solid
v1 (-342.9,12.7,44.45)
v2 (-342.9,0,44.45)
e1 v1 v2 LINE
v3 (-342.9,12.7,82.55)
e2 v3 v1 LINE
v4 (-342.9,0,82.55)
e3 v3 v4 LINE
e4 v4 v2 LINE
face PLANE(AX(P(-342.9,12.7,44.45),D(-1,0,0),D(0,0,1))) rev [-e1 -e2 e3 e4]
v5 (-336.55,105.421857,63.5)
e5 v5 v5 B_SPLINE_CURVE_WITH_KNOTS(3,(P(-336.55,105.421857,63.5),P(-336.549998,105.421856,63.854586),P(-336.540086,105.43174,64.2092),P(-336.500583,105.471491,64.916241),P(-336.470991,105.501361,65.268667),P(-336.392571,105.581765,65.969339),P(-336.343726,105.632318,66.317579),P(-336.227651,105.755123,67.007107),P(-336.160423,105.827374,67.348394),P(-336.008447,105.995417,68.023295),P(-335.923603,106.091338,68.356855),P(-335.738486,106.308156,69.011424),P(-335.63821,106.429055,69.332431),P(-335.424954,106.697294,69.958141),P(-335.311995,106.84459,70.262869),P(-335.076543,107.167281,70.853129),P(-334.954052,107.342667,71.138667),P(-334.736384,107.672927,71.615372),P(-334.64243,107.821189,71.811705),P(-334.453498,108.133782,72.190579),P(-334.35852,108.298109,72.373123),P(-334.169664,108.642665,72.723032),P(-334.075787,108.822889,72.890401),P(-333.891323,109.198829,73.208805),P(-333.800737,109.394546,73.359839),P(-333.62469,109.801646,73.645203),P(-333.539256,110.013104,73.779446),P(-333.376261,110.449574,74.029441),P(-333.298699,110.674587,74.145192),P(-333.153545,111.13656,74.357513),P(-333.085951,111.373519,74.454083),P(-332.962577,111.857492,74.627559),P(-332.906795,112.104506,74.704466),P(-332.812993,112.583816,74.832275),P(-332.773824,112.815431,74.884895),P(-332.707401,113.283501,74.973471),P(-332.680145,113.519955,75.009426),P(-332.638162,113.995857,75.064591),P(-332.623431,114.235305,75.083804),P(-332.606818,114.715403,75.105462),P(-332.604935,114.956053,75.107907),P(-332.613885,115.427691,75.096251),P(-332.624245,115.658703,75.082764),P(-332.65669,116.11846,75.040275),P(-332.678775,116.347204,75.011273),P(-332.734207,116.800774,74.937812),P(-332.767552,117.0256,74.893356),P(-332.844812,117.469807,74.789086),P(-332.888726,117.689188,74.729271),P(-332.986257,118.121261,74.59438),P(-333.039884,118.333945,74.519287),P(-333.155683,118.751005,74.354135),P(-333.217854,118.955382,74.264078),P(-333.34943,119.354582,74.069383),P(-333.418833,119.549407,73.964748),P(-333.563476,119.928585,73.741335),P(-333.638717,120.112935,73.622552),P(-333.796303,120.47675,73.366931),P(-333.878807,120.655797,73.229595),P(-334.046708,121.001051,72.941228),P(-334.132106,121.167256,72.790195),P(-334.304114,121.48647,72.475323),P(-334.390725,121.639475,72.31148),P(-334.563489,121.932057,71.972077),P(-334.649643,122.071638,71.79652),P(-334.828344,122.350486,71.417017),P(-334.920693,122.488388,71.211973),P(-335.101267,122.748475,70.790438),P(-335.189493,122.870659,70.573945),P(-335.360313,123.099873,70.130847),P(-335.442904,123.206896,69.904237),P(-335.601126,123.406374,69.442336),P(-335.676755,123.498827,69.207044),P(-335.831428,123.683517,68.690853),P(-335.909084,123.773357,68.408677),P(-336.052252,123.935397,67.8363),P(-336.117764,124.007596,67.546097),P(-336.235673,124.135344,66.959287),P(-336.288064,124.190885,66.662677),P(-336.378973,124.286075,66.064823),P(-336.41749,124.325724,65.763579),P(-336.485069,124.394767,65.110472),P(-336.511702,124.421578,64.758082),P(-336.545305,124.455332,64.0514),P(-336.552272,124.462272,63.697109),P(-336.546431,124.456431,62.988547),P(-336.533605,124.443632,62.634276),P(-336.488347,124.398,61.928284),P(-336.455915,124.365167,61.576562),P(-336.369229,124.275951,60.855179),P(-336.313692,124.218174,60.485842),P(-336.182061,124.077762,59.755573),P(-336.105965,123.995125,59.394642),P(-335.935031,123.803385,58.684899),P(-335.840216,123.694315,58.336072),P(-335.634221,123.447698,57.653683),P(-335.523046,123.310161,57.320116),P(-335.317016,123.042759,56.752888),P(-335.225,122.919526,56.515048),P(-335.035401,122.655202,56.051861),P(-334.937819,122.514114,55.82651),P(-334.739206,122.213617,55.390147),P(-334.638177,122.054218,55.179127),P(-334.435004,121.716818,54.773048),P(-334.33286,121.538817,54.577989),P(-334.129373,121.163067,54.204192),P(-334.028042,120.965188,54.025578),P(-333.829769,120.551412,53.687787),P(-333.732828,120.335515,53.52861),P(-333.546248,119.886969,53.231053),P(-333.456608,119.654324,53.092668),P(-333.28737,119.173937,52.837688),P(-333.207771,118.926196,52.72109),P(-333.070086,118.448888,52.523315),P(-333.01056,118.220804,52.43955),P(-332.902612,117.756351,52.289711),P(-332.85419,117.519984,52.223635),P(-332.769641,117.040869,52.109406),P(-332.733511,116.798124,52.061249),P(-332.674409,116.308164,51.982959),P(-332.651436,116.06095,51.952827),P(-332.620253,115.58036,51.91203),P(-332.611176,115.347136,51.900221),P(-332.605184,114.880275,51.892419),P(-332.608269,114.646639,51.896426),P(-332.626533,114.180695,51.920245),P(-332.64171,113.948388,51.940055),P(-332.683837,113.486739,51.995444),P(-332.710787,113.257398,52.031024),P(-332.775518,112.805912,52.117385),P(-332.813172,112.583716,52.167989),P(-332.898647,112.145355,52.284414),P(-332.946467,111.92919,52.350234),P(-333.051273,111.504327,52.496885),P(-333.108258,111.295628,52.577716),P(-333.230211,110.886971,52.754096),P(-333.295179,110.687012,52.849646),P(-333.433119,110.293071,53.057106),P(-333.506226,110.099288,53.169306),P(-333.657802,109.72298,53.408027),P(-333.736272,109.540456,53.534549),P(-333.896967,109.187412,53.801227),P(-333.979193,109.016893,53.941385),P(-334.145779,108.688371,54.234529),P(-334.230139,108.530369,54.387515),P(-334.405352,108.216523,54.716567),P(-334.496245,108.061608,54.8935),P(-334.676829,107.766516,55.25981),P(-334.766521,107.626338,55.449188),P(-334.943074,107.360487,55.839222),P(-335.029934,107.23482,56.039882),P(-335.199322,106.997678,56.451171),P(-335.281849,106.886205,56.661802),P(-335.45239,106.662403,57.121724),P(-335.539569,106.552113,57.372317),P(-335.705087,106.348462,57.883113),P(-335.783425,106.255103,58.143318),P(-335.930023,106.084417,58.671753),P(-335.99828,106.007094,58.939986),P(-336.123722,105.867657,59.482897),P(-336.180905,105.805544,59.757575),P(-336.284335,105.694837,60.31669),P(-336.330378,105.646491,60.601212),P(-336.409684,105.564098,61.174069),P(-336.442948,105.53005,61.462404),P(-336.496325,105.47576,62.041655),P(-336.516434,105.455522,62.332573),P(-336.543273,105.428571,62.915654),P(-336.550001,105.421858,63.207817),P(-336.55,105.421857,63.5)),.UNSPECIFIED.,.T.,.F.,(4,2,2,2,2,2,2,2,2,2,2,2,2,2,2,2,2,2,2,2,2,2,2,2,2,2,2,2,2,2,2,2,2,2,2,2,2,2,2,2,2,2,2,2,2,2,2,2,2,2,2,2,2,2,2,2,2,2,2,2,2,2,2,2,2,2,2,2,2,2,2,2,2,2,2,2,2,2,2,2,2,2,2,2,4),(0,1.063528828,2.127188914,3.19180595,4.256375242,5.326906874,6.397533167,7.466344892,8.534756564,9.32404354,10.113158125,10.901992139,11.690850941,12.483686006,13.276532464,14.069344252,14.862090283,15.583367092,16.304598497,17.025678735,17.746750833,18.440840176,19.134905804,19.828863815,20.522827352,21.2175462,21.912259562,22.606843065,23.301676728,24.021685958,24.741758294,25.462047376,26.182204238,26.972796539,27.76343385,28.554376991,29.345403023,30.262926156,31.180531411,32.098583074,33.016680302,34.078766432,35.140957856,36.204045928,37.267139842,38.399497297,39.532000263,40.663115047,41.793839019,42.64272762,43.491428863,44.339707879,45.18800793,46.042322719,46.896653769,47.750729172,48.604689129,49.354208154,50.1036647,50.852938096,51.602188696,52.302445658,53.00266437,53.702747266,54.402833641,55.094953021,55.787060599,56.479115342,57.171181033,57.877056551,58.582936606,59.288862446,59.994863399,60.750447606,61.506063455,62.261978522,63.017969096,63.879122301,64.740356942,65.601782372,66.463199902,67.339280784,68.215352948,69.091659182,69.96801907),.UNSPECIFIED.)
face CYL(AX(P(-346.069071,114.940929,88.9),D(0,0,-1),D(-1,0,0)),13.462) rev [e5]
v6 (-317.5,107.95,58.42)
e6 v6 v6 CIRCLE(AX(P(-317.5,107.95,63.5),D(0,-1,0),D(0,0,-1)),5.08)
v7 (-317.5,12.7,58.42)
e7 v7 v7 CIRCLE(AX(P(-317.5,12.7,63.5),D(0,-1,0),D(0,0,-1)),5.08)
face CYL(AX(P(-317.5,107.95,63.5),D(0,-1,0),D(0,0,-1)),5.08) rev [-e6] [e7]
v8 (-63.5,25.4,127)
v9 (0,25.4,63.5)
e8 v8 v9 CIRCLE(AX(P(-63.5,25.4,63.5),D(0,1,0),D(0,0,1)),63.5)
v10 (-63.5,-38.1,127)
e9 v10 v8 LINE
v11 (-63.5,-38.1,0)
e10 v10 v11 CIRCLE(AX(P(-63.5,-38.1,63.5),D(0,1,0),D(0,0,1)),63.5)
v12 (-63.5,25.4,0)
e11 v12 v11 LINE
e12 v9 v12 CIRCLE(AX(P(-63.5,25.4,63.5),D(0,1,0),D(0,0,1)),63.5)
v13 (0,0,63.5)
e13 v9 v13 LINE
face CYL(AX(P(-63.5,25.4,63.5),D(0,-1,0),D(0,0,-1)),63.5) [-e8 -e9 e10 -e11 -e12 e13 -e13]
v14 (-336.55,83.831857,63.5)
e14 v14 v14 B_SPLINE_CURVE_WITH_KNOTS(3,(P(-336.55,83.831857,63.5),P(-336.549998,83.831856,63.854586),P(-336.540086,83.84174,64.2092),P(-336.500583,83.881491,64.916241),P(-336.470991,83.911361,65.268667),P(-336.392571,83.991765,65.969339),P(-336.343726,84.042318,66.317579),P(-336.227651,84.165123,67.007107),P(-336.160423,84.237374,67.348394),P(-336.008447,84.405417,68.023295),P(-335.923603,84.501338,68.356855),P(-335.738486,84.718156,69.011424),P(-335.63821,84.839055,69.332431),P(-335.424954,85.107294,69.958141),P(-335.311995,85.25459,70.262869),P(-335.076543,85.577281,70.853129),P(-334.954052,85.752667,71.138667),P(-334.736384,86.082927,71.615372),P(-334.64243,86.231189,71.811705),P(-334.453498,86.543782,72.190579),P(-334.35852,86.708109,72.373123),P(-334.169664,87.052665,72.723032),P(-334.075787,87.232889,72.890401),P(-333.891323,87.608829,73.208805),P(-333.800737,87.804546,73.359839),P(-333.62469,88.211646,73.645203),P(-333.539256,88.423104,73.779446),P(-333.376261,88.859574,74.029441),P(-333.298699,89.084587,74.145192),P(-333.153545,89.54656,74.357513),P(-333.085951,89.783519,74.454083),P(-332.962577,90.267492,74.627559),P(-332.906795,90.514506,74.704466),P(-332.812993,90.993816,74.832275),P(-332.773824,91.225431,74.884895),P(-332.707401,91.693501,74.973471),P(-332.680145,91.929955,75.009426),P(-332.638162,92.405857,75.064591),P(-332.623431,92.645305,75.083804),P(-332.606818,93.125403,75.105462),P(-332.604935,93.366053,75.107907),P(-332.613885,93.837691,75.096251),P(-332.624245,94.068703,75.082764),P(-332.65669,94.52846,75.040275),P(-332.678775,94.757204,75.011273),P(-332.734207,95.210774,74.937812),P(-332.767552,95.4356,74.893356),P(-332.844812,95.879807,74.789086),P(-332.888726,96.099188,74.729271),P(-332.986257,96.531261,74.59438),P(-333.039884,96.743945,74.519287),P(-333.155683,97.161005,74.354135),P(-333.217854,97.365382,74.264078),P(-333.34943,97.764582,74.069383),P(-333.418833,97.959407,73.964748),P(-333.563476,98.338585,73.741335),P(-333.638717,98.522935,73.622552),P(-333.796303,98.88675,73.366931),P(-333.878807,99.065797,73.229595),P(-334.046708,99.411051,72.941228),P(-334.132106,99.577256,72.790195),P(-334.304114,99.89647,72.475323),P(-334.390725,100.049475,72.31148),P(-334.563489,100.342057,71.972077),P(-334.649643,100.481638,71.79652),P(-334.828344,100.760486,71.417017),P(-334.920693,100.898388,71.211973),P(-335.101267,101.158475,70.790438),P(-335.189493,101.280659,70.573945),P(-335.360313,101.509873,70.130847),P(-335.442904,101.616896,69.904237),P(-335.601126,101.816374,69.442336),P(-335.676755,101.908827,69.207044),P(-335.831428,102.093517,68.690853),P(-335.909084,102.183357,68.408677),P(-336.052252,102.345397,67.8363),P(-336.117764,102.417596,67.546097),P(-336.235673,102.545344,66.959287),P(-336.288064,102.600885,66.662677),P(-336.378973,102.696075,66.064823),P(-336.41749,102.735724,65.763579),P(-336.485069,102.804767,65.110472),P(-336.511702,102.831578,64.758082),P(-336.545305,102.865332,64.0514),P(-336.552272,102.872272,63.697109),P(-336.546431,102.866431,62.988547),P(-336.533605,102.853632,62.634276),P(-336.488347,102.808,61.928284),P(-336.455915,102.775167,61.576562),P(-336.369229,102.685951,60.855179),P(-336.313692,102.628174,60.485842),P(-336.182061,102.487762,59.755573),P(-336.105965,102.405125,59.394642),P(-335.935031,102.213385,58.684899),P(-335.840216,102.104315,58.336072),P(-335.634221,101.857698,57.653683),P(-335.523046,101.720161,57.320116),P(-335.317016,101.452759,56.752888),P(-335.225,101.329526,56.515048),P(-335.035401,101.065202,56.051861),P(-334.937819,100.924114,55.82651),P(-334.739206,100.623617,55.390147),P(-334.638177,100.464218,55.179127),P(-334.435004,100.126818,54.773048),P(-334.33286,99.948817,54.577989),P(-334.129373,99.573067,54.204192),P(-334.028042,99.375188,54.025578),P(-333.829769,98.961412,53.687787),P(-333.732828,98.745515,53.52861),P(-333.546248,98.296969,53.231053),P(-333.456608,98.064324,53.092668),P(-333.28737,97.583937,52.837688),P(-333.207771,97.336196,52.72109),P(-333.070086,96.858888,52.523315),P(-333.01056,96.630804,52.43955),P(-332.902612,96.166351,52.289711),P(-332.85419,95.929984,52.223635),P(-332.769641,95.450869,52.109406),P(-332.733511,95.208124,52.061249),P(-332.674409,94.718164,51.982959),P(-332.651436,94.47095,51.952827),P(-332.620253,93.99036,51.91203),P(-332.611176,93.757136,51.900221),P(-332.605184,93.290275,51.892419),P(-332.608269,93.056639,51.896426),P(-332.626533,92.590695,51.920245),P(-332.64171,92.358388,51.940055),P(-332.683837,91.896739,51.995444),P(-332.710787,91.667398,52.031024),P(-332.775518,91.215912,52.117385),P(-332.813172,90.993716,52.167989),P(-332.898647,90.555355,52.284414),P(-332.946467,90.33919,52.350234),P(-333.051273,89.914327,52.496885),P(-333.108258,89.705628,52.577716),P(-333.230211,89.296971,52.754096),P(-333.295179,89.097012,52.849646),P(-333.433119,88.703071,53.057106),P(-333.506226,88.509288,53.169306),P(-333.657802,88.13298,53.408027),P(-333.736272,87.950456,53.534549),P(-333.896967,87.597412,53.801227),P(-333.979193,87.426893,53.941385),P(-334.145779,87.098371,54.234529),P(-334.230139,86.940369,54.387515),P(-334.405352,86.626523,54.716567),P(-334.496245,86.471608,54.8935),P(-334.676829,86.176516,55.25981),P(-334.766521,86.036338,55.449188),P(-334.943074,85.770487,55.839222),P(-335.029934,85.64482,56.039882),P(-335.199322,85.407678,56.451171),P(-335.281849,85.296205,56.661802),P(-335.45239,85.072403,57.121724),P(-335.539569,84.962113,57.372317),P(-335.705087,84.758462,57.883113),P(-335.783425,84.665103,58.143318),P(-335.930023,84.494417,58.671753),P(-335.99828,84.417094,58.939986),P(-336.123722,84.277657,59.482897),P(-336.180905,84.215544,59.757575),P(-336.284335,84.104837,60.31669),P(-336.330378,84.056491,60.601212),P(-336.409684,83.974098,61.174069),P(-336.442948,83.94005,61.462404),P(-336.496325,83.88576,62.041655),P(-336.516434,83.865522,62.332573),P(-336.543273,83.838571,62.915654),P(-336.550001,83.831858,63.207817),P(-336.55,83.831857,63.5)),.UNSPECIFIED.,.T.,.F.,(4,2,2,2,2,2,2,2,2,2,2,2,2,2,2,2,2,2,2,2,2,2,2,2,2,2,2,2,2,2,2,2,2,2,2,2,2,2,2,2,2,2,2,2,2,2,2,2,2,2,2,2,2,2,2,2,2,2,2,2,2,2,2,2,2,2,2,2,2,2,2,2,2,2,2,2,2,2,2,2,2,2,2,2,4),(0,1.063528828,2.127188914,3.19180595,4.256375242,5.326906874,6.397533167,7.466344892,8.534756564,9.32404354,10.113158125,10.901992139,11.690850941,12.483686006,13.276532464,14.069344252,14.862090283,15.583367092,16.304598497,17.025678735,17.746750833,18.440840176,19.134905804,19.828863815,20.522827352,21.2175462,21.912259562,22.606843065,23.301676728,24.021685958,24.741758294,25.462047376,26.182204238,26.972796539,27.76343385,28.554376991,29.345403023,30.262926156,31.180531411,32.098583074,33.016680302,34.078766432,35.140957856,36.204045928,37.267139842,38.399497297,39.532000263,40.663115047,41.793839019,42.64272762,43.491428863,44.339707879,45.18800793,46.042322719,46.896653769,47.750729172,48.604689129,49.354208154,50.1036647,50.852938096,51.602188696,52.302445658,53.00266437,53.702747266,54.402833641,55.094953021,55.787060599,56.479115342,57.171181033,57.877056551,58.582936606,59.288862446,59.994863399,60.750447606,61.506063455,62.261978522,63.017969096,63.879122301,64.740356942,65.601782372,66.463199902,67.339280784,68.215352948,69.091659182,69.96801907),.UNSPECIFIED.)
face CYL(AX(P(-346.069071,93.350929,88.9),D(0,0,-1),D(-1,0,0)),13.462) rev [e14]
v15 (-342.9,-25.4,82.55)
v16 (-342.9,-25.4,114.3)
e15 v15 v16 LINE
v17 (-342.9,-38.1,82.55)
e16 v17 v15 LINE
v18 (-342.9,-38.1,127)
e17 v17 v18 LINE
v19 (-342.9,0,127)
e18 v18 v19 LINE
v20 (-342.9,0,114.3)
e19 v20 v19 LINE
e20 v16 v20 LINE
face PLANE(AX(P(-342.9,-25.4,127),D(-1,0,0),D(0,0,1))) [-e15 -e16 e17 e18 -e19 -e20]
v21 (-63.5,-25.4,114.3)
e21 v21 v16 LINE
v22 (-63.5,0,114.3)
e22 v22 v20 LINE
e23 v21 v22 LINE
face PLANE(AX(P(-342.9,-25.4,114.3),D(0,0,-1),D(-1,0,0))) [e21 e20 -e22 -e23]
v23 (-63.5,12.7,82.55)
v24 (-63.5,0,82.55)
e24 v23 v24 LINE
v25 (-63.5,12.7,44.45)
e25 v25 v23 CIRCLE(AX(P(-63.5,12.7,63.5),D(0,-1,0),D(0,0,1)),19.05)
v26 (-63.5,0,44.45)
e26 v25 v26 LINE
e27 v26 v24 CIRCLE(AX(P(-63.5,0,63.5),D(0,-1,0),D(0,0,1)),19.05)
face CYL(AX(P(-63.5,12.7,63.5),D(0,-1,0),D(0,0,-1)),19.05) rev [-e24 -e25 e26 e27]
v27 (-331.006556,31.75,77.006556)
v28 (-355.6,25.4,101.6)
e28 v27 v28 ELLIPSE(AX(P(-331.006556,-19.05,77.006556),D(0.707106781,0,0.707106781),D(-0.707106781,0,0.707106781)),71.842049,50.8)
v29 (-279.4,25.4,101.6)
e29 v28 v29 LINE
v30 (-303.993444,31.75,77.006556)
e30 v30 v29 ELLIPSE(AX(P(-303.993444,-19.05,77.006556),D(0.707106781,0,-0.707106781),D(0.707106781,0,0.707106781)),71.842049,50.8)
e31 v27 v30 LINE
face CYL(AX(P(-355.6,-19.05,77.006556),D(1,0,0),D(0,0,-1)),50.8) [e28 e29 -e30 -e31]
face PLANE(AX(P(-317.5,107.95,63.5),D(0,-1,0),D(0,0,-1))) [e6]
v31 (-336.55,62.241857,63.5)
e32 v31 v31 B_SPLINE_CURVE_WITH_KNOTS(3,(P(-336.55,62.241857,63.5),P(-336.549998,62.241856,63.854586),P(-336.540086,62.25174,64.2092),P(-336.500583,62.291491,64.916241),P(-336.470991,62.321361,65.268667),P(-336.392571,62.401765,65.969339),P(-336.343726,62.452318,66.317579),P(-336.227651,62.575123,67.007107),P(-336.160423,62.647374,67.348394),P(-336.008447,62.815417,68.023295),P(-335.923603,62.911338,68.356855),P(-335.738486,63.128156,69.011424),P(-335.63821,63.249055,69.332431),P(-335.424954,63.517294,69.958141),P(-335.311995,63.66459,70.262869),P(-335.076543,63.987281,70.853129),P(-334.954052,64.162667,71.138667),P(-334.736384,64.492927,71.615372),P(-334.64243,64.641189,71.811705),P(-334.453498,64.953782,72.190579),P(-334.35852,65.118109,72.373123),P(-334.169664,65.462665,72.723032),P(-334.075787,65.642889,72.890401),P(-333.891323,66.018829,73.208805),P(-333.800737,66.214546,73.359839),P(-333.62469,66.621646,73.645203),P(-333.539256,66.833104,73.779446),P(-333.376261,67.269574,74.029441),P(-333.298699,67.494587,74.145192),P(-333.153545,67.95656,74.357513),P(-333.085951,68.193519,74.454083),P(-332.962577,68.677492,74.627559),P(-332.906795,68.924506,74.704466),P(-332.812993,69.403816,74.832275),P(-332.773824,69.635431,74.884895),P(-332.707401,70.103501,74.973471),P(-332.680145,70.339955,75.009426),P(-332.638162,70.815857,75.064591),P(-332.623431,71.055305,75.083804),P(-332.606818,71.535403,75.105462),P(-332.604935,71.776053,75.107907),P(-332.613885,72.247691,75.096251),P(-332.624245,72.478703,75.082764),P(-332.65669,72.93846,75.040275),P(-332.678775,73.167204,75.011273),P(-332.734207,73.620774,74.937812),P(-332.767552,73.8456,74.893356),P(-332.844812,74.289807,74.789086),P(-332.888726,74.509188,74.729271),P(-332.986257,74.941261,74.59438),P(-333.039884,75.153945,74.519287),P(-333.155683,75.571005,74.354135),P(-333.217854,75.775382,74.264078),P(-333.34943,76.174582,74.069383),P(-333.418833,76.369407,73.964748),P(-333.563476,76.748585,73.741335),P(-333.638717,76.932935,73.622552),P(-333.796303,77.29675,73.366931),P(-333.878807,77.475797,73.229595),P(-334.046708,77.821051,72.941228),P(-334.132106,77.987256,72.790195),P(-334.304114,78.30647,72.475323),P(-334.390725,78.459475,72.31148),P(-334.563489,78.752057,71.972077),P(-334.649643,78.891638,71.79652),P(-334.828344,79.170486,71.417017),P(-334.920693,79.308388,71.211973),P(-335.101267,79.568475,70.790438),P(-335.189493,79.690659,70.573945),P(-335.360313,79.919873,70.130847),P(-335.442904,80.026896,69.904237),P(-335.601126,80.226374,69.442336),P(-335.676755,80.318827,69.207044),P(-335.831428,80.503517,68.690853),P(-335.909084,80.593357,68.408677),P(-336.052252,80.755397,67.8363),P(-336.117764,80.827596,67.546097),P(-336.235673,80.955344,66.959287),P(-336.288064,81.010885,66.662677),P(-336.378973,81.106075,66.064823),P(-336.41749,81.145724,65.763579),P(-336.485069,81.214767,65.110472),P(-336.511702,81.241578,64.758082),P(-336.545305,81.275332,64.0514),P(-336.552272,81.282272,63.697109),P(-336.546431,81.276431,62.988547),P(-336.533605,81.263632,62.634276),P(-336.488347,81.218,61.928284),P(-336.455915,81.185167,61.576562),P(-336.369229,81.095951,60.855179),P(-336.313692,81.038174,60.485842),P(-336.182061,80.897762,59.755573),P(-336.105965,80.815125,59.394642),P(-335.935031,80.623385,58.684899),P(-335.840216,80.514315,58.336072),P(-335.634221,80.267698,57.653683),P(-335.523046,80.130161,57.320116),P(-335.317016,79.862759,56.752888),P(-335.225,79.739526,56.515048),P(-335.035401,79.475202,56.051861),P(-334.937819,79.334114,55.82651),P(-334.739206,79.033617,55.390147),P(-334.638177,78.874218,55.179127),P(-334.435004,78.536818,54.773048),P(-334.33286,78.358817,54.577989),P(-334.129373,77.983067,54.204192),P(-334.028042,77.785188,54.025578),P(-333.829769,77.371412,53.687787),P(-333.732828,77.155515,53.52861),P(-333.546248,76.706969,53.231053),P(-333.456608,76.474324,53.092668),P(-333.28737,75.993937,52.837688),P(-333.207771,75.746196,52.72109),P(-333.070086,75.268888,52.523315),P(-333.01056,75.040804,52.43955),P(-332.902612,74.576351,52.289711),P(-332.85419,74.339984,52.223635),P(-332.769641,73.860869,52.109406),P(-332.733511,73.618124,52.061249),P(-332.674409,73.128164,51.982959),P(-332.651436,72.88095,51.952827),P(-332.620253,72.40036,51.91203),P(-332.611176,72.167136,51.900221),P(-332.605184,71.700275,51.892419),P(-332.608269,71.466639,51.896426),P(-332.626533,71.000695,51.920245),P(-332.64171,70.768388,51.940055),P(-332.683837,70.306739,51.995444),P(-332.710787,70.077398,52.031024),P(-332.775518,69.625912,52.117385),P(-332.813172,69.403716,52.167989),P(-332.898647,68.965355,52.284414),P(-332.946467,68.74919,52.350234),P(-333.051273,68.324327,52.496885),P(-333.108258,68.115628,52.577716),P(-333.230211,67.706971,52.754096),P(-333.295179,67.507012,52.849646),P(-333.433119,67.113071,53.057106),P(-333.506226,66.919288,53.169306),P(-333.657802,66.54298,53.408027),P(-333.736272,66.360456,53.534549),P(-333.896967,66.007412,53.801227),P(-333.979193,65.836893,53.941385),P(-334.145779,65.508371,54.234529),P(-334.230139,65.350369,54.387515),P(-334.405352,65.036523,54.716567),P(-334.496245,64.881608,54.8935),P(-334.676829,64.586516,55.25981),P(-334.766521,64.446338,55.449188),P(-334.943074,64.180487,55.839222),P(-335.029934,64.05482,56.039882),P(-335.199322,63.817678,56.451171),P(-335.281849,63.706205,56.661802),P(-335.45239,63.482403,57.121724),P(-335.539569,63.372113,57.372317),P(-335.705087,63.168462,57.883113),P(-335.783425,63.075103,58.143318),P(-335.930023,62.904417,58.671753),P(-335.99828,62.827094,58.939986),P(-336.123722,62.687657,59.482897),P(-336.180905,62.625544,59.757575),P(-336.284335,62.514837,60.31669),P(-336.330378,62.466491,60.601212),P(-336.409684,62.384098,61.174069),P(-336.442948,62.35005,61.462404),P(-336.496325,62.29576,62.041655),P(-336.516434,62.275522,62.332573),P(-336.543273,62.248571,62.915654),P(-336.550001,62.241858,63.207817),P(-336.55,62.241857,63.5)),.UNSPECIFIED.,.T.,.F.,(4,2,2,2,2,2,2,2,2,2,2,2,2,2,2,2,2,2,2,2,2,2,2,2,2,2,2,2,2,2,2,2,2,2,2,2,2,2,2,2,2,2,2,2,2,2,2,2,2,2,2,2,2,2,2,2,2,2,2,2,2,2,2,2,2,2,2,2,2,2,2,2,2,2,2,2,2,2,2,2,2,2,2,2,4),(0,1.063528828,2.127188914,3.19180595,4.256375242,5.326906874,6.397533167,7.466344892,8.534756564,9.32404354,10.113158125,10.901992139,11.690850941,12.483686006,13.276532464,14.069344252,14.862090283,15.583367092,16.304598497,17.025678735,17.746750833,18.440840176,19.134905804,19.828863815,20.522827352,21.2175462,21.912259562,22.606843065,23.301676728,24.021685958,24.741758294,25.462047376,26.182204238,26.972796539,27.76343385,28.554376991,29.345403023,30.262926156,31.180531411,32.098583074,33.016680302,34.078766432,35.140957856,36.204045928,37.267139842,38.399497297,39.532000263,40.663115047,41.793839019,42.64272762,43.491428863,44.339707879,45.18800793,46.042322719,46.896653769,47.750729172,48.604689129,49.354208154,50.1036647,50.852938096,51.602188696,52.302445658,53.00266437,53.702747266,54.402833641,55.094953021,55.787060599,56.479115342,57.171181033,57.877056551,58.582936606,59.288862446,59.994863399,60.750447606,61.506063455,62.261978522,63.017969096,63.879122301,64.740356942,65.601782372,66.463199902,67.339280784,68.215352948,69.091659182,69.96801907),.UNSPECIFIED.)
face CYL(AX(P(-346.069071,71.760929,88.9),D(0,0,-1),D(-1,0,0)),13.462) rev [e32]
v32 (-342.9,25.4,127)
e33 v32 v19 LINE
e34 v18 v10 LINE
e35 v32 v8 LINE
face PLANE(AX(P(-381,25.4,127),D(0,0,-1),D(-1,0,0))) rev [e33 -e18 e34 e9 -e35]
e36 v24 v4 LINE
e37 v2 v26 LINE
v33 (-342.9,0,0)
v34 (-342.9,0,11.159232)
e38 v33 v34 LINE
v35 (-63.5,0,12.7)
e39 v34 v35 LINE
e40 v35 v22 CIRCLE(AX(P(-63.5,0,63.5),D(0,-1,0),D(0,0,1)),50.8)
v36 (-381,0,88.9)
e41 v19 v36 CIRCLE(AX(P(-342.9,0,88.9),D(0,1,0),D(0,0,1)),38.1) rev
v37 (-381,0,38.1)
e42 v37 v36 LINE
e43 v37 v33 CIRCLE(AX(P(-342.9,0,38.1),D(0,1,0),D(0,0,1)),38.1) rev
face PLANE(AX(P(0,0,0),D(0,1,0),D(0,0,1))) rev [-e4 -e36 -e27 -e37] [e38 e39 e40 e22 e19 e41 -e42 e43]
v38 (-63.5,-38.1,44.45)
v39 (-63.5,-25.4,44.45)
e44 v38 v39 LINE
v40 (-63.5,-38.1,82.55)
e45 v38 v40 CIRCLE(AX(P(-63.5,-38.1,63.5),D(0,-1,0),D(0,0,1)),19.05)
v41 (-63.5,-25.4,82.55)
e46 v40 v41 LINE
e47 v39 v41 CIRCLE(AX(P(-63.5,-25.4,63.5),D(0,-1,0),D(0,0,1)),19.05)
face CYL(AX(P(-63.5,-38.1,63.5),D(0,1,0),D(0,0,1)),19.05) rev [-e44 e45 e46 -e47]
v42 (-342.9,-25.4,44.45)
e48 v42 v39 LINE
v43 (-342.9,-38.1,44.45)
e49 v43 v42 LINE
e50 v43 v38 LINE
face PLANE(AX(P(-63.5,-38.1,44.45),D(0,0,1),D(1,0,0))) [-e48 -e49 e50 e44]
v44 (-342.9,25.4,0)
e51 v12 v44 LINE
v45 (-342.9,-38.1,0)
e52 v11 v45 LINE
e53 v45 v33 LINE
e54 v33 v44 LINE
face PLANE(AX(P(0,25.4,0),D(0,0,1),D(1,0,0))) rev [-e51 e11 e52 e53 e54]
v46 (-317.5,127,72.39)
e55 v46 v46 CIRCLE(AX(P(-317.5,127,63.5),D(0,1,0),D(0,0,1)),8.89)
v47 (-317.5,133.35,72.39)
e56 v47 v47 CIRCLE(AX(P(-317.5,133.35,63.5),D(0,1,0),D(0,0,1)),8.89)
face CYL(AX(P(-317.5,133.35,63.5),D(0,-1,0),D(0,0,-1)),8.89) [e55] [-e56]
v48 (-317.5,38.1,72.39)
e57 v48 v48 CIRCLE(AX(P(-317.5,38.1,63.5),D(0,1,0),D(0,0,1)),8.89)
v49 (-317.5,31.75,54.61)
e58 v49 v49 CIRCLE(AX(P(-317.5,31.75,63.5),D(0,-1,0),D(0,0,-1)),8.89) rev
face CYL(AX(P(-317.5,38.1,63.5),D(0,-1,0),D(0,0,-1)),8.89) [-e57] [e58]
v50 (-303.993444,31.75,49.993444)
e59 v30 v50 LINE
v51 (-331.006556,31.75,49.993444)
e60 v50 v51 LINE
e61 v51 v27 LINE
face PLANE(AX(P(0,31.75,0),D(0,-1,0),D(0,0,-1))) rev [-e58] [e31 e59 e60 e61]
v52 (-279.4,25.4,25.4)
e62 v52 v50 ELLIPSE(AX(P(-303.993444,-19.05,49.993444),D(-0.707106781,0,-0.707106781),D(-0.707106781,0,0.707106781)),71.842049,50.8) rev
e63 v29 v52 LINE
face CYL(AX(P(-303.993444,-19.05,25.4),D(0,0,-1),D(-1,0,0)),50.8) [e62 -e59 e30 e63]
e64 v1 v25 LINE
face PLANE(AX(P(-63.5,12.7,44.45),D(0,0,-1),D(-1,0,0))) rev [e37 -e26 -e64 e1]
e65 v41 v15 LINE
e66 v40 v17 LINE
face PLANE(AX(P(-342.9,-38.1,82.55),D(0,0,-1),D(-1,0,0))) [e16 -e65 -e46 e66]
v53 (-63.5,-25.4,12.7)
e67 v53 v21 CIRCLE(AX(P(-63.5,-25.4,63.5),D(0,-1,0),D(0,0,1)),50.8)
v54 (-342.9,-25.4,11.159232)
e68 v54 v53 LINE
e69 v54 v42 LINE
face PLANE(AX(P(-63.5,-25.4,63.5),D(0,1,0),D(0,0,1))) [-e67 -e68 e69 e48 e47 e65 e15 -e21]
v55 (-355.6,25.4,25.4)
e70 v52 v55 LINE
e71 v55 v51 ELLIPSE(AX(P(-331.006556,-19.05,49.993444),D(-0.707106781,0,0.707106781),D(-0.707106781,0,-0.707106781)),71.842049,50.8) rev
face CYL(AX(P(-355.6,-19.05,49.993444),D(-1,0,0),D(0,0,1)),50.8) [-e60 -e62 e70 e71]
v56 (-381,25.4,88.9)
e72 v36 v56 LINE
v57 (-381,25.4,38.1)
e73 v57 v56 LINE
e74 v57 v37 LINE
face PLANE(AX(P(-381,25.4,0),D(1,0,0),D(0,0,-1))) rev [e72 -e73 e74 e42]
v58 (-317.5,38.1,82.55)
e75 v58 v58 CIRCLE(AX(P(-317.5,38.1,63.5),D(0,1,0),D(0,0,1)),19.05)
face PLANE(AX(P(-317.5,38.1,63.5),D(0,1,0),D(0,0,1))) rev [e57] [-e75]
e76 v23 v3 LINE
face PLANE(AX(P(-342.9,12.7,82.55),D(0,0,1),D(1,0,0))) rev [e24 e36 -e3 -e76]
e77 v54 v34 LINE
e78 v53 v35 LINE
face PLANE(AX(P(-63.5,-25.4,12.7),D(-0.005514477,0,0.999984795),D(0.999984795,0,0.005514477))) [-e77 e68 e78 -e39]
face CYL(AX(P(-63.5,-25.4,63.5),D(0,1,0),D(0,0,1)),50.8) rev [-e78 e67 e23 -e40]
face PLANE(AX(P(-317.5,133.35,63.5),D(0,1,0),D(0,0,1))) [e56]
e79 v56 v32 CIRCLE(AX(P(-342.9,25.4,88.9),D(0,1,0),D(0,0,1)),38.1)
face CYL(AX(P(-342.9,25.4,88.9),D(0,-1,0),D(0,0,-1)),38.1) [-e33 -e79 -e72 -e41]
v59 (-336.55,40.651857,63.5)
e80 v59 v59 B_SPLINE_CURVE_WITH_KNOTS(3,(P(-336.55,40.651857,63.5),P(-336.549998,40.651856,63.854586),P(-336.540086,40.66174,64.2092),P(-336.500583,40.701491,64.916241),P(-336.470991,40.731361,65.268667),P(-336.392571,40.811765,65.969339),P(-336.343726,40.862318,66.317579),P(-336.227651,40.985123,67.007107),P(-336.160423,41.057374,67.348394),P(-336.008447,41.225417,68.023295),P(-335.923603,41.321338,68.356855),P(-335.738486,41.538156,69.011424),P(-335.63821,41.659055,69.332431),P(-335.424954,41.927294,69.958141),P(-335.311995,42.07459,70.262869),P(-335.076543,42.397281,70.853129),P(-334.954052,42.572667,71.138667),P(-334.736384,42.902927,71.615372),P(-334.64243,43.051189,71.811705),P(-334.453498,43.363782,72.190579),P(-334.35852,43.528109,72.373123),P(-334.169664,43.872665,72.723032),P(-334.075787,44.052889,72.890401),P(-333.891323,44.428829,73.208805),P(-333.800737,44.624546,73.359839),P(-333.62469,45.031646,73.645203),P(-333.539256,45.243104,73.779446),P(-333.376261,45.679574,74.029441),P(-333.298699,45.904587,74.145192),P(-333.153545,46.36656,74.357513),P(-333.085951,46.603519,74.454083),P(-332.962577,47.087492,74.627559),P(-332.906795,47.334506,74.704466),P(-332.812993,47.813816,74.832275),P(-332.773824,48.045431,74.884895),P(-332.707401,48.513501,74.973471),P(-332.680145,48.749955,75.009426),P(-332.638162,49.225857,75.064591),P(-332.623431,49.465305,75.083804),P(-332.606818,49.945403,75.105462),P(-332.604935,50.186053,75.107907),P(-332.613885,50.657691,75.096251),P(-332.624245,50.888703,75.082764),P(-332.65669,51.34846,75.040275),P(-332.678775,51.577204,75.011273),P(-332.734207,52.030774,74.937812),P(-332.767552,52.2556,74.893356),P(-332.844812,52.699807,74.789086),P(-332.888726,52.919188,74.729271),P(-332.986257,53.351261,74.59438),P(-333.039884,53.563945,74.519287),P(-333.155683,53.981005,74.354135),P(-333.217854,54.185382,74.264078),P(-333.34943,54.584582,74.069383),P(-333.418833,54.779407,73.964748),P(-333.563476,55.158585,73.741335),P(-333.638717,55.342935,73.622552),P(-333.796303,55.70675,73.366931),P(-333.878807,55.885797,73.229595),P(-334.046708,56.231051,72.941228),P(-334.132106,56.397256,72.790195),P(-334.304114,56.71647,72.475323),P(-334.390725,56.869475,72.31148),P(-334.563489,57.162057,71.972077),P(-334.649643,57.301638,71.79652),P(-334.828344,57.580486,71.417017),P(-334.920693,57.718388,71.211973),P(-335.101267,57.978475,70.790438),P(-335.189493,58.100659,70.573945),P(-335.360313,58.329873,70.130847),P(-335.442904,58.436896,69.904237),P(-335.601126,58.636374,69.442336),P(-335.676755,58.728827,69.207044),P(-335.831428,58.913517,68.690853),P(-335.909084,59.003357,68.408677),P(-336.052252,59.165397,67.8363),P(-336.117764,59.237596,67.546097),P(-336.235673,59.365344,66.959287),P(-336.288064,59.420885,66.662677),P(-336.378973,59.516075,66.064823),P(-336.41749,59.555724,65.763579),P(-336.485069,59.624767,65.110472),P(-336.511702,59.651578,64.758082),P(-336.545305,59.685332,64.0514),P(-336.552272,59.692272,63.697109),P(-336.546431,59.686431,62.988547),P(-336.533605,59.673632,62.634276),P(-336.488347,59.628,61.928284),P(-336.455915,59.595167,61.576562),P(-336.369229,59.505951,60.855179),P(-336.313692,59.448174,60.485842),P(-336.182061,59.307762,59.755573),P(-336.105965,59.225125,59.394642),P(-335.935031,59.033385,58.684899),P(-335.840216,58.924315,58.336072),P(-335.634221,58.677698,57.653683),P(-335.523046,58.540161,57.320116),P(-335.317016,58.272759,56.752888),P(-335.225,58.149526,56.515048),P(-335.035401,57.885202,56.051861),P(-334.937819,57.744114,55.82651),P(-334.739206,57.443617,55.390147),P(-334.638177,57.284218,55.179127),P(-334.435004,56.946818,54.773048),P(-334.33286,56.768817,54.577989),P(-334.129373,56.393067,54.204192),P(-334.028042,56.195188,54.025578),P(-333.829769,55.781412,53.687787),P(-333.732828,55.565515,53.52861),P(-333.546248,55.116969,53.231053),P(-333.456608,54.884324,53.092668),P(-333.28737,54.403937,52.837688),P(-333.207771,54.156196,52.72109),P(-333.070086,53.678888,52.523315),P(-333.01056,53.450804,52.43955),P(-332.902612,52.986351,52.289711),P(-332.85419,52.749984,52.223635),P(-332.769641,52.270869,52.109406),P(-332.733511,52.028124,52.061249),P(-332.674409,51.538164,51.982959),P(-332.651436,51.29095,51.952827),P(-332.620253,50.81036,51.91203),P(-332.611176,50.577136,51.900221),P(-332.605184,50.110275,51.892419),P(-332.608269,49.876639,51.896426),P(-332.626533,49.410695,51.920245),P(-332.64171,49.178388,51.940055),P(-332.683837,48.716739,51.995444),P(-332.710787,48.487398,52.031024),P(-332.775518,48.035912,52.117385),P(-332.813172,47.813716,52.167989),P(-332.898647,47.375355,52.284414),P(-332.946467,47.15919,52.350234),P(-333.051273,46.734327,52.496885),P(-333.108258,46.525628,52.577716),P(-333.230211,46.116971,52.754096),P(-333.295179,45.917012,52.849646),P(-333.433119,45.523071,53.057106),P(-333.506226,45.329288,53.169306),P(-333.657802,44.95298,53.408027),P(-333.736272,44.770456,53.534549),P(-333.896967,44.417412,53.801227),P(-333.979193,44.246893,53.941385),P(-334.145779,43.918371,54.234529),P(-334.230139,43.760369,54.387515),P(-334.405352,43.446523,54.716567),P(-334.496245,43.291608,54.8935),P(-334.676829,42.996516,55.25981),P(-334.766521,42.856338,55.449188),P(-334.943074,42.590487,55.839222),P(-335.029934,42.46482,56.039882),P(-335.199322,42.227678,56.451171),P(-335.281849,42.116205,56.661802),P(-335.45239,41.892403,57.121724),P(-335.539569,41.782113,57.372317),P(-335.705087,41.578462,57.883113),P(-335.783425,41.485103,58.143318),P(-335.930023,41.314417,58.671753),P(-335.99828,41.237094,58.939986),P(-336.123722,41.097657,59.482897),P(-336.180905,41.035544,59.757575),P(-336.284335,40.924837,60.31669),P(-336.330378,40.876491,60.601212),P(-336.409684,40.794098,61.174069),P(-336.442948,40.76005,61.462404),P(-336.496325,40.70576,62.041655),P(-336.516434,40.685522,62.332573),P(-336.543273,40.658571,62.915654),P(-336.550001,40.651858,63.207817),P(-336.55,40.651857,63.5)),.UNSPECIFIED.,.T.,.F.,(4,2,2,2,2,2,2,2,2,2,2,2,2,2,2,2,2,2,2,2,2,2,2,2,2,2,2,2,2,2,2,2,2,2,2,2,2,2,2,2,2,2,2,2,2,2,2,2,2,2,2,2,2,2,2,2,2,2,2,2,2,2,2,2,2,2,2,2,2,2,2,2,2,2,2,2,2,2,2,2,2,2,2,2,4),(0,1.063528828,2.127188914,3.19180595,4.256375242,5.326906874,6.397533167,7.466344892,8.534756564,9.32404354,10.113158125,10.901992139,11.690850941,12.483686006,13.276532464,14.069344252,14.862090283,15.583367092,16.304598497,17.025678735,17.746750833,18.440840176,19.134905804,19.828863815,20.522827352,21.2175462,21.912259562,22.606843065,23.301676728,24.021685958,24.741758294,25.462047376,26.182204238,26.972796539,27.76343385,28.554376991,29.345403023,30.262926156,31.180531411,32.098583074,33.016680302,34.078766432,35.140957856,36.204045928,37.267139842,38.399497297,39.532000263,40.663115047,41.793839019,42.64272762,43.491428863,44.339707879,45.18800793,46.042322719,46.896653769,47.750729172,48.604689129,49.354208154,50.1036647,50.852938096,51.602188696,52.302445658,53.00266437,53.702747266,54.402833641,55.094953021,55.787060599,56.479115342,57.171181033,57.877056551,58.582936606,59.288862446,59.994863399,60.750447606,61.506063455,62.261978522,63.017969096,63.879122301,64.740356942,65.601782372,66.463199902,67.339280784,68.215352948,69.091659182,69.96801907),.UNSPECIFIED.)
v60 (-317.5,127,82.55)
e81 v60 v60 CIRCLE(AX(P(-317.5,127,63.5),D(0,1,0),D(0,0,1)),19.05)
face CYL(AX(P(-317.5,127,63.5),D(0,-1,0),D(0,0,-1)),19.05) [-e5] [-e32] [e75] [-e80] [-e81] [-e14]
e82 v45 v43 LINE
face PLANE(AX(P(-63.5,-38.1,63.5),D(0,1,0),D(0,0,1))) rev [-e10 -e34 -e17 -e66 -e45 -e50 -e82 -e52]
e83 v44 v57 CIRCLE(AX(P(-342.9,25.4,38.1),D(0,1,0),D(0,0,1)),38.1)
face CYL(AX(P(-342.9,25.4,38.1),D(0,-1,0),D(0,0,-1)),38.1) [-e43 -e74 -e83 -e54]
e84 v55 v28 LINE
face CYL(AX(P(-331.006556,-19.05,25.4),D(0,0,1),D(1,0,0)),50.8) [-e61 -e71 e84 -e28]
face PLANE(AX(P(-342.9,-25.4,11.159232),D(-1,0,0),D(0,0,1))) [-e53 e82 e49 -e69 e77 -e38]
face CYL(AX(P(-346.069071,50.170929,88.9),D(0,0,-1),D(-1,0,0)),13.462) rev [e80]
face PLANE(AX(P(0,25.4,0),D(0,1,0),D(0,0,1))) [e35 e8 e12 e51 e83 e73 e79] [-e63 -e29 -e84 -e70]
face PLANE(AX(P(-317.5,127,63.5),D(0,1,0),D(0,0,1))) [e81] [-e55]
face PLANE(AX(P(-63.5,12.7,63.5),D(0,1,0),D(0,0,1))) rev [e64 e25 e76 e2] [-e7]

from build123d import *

# Parameters (mm, degrees)
SKETCH1_W           = 381
SKETCH1_H           = 127
BOSS_EXTRUDE1_DEPTH = 25.4
FILLET1_R           = 63.5
FILLET2_R           = 38.1
BOSS_EXTRUDE2_DEPTH = 25.4
BOSS_EXTRUDE3_DEPTH = 12.7
SKETCH4_W           = 76.2
SKETCH4_H           = 76.2
BOSS_EXTRUDE4_DEPTH = 6.35
FILLET3_R           = 50.8
SKETCH5_R           = 8.89
BOSS_EXTRUDE5_DEPTH = 6.35
SKETCH6_R           = 19.05
BOSS_EXTRUDE6_DEPTH = 88.9
CUT_EXTRUDE1_DEPTH  = 88.9
SKETCH8_R           = 8.89
BOSS_EXTRUDE7_DEPTH = 6.35
CUT_EXTRUDE2_START  = -12.7
CUT_EXTRUDE2_DEPTH  = 12.7
SKETCH10_R          = 5.08
CUT_EXTRUDE3_DEPTH  = 95.25


# Some blends are built 0.0001 mm under size
with BuildPart() as part:
    # Sketch1 → Boss-Extrude1 (new body)
    with BuildSketch(Plane(origin=(0, 0, 0), x_dir=(1, 0, 0), z_dir=(0, 1, 0))):
        with Locations((-190.5, -63.5)):
            Rectangle(SKETCH1_W, SKETCH1_H)
    extrude(amount=BOSS_EXTRUDE1_DEPTH)

    # Fillet1
    fillet1_edges = [part.edges().sort_by_distance(p)[0] for p in [
        (0, 12.7, 0),
        (0, 12.7, 127),
    ]]
    fillet(fillet1_edges, radius=FILLET1_R - 0.0001)  # a hair under: the kernel refuses the full size

    # Fillet2
    fillet2_edges = [part.edges().sort_by_distance(p)[0] for p in [
        (-381, 12.7, 127),
        (-381, 12.7, 0),
    ]]
    fillet(fillet2_edges, radius=FILLET2_R)

    # Sketch2 → Boss-Extrude2 (add)
    with BuildSketch(Plane(origin=(0, 0, 0), x_dir=(1, 0, 0), z_dir=(0, 1, 0))):
        with BuildLine():
            Line((-63.5, -12.7), (-342.9, -11.159231637))
            Line((-342.9, -11.159231637), (-342.9, 0))
            Line((-342.9, 0), (-63.5, 0))
            ThreePointArc((-63.5, 0), (0, -63.5), (-63.5, -127))
            Line((-63.5, -127), (-342.9, -127))
            Line((-342.9, -127), (-342.9, -114.3))
            Line((-342.9, -114.3), (-63.5, -114.3))
            ThreePointArc((-63.5, -114.3), (-12.7, -63.5), (-63.5, -12.7))
        make_face()
    extrude(amount=-BOSS_EXTRUDE2_DEPTH)

    # Sketch3 → Boss-Extrude3 (add)
    with BuildSketch(Plane(origin=(0, -25.4, 0), x_dir=(1, 0, 0), z_dir=(0, 1, 0))):
        with BuildLine():
            Line((-342.9, -127), (-342.9, -82.55))
            Line((-342.9, -82.55), (-63.5, -82.55))
            ThreePointArc((-63.5, -82.55), (-44.45, -63.5), (-63.5, -44.45))
            Line((-63.5, -44.45), (-342.9, -44.45))
            Line((-342.9, -44.45), (-342.9, 0))
            Line((-342.9, 0), (-63.5, 0))
            ThreePointArc((-63.5, 0), (0, -63.5), (-63.5, -127))
            Line((-63.5, -127), (-342.9, -127))
        make_face()
    extrude(amount=-BOSS_EXTRUDE3_DEPTH)

    # Sketch4 → Boss-Extrude4 (add)
    with BuildSketch(Plane(origin=(0, 25.4, 0), x_dir=(1, 0, 0), z_dir=(0, 1, 0))):
        with Locations((-317.5, -63.5)):
            Rectangle(SKETCH4_W, SKETCH4_H)
    extrude(amount=BOSS_EXTRUDE4_DEPTH)

    # Fillet3
    # the kernel refuses this fillet: 50.8 mm, written as the material it takes off along each edge
    with BuildSketch(Plane(origin=(-279.4, 31.75, 163.083610621), x_dir=(0, -1, 0), z_dir=(0, 0, -1)), Plane(origin=(-417.083610621, 31.75, 101.6), x_dir=(0, -1, 0), z_dir=(1, 0, 0)), Plane(origin=(-355.6, 31.75, -36.083610621), x_dir=(0, -1, 0), z_dir=(0, 0, 1)), Plane(origin=(-217.916389379, 31.75, 25.4), x_dir=(0, -1, 0), z_dir=(-1, 0, 0))) as fillet3_piece_1:
        with BuildLine():
            CenterArc((50.8, 24.593444248), FILLET3_R, 180, 28.955024372)
            Line((0, 24.593444248), (-1.016, 24.593444248))
            Line((-1.016, 24.593444248), (-1.016, 0))
            Line((-1.016, 0), (0, -1.016))
            ThreePointArc((0, -1.016), (3.175, -1.016), (5.461, -0.491868885))
            Line((5.461, -0.491868885), (6.35, 0))
        make_face()
    extrude(amount=199.167221242, mode=Mode.SUBTRACT)

    # Sketch5 → Boss-Extrude5 (add)
    with BuildSketch(Plane(origin=(0, 31.75, 0), x_dir=(1, 0, 0), z_dir=(0, 1, 0))):
        with Locations(Location((-317.5, -63.5, 0), (0, 0, 90))):
            Circle(SKETCH5_R)
    extrude(amount=BOSS_EXTRUDE5_DEPTH)

    # Sketch6 → Boss-Extrude6 (add)
    with BuildSketch(Plane(origin=(0, 38.1, 0), x_dir=(1, 0, 0), z_dir=(0, 1, 0))):
        with Locations(Location((-317.5, -63.5, 0), (0, 0, 270))):
            Circle(SKETCH6_R)
    extrude(amount=BOSS_EXTRUDE6_DEPTH)

    # Sketch7 → Cut-Extrude1 (cut)
    with BuildSketch(Plane.XY):
        with BuildLine():
            Line((-336.55, 127), (-336.55, 124.46))
            ThreePointArc((-336.55, 124.46), (-332.607071488, 114.940928512), (-336.55, 105.421857023))
            Line((-336.55, 105.421857023), (-336.55, 105.41))
            Line((-336.55, 105.41), (-336.55, 102.87))
            ThreePointArc((-336.55, 102.87), (-332.607071488, 93.350928512), (-336.55, 83.831857023))
            Line((-336.55, 83.831857023), (-336.55, 83.82))
            Line((-336.55, 83.82), (-336.55, 81.28))
            ThreePointArc((-336.55, 81.28), (-332.607071488, 71.760928512), (-336.55, 62.241857023))
            Line((-336.55, 62.241857023), (-336.55, 62.23))
            Line((-336.55, 62.23), (-336.55, 59.69))
            ThreePointArc((-336.55, 59.69), (-332.607071488, 50.170928512), (-336.55, 40.651857023))
            Line((-336.55, 40.651857023), (-336.55, 40.64))
            Line((-336.55, 40.64), (-368.013875858, 40.64))
            Line((-368.013875858, 40.64), (-368.013875858, 127.710007378))
            Line((-368.013875858, 127.710007378), (-336.55, 127))
        make_face()
    extrude(amount=CUT_EXTRUDE1_DEPTH, mode=Mode.SUBTRACT)

    # Sketch8 → Boss-Extrude7 (add)
    with BuildSketch(Plane(origin=(0, 127, 0), x_dir=(1, 0, 0), z_dir=(0, 1, 0))):
        with Locations(Location((-317.5, -63.5, 0), (0, 0, 90))):
            Circle(SKETCH8_R)
    extrude(amount=BOSS_EXTRUDE7_DEPTH)

    # Sketch9 → Cut-Extrude2 (cut)
    with BuildSketch(Plane.XZ.offset(CUT_EXTRUDE2_START)):
        with BuildLine():
            Line((-342.9, 82.55), (-63.5, 82.55))
            ThreePointArc((-63.5, 82.55), (-44.45, 63.5), (-63.5, 44.45))
            Line((-63.5, 44.45), (-342.9, 44.45))
            Line((-342.9, 44.45), (-342.9, 82.55))
        make_face()
    extrude(amount=CUT_EXTRUDE2_DEPTH, mode=Mode.SUBTRACT)

    # Sketch10 → Cut-Extrude3 (cut)
    with BuildSketch(Plane.XZ.offset(-12.7)):
        with Locations(Location((-317.5, 63.5, 0), (0, 0, 270))):
            Circle(SKETCH10_R)
    extrude(amount=-CUT_EXTRUDE3_DEPTH, mode=Mode.SUBTRACT)


solid = part.part
